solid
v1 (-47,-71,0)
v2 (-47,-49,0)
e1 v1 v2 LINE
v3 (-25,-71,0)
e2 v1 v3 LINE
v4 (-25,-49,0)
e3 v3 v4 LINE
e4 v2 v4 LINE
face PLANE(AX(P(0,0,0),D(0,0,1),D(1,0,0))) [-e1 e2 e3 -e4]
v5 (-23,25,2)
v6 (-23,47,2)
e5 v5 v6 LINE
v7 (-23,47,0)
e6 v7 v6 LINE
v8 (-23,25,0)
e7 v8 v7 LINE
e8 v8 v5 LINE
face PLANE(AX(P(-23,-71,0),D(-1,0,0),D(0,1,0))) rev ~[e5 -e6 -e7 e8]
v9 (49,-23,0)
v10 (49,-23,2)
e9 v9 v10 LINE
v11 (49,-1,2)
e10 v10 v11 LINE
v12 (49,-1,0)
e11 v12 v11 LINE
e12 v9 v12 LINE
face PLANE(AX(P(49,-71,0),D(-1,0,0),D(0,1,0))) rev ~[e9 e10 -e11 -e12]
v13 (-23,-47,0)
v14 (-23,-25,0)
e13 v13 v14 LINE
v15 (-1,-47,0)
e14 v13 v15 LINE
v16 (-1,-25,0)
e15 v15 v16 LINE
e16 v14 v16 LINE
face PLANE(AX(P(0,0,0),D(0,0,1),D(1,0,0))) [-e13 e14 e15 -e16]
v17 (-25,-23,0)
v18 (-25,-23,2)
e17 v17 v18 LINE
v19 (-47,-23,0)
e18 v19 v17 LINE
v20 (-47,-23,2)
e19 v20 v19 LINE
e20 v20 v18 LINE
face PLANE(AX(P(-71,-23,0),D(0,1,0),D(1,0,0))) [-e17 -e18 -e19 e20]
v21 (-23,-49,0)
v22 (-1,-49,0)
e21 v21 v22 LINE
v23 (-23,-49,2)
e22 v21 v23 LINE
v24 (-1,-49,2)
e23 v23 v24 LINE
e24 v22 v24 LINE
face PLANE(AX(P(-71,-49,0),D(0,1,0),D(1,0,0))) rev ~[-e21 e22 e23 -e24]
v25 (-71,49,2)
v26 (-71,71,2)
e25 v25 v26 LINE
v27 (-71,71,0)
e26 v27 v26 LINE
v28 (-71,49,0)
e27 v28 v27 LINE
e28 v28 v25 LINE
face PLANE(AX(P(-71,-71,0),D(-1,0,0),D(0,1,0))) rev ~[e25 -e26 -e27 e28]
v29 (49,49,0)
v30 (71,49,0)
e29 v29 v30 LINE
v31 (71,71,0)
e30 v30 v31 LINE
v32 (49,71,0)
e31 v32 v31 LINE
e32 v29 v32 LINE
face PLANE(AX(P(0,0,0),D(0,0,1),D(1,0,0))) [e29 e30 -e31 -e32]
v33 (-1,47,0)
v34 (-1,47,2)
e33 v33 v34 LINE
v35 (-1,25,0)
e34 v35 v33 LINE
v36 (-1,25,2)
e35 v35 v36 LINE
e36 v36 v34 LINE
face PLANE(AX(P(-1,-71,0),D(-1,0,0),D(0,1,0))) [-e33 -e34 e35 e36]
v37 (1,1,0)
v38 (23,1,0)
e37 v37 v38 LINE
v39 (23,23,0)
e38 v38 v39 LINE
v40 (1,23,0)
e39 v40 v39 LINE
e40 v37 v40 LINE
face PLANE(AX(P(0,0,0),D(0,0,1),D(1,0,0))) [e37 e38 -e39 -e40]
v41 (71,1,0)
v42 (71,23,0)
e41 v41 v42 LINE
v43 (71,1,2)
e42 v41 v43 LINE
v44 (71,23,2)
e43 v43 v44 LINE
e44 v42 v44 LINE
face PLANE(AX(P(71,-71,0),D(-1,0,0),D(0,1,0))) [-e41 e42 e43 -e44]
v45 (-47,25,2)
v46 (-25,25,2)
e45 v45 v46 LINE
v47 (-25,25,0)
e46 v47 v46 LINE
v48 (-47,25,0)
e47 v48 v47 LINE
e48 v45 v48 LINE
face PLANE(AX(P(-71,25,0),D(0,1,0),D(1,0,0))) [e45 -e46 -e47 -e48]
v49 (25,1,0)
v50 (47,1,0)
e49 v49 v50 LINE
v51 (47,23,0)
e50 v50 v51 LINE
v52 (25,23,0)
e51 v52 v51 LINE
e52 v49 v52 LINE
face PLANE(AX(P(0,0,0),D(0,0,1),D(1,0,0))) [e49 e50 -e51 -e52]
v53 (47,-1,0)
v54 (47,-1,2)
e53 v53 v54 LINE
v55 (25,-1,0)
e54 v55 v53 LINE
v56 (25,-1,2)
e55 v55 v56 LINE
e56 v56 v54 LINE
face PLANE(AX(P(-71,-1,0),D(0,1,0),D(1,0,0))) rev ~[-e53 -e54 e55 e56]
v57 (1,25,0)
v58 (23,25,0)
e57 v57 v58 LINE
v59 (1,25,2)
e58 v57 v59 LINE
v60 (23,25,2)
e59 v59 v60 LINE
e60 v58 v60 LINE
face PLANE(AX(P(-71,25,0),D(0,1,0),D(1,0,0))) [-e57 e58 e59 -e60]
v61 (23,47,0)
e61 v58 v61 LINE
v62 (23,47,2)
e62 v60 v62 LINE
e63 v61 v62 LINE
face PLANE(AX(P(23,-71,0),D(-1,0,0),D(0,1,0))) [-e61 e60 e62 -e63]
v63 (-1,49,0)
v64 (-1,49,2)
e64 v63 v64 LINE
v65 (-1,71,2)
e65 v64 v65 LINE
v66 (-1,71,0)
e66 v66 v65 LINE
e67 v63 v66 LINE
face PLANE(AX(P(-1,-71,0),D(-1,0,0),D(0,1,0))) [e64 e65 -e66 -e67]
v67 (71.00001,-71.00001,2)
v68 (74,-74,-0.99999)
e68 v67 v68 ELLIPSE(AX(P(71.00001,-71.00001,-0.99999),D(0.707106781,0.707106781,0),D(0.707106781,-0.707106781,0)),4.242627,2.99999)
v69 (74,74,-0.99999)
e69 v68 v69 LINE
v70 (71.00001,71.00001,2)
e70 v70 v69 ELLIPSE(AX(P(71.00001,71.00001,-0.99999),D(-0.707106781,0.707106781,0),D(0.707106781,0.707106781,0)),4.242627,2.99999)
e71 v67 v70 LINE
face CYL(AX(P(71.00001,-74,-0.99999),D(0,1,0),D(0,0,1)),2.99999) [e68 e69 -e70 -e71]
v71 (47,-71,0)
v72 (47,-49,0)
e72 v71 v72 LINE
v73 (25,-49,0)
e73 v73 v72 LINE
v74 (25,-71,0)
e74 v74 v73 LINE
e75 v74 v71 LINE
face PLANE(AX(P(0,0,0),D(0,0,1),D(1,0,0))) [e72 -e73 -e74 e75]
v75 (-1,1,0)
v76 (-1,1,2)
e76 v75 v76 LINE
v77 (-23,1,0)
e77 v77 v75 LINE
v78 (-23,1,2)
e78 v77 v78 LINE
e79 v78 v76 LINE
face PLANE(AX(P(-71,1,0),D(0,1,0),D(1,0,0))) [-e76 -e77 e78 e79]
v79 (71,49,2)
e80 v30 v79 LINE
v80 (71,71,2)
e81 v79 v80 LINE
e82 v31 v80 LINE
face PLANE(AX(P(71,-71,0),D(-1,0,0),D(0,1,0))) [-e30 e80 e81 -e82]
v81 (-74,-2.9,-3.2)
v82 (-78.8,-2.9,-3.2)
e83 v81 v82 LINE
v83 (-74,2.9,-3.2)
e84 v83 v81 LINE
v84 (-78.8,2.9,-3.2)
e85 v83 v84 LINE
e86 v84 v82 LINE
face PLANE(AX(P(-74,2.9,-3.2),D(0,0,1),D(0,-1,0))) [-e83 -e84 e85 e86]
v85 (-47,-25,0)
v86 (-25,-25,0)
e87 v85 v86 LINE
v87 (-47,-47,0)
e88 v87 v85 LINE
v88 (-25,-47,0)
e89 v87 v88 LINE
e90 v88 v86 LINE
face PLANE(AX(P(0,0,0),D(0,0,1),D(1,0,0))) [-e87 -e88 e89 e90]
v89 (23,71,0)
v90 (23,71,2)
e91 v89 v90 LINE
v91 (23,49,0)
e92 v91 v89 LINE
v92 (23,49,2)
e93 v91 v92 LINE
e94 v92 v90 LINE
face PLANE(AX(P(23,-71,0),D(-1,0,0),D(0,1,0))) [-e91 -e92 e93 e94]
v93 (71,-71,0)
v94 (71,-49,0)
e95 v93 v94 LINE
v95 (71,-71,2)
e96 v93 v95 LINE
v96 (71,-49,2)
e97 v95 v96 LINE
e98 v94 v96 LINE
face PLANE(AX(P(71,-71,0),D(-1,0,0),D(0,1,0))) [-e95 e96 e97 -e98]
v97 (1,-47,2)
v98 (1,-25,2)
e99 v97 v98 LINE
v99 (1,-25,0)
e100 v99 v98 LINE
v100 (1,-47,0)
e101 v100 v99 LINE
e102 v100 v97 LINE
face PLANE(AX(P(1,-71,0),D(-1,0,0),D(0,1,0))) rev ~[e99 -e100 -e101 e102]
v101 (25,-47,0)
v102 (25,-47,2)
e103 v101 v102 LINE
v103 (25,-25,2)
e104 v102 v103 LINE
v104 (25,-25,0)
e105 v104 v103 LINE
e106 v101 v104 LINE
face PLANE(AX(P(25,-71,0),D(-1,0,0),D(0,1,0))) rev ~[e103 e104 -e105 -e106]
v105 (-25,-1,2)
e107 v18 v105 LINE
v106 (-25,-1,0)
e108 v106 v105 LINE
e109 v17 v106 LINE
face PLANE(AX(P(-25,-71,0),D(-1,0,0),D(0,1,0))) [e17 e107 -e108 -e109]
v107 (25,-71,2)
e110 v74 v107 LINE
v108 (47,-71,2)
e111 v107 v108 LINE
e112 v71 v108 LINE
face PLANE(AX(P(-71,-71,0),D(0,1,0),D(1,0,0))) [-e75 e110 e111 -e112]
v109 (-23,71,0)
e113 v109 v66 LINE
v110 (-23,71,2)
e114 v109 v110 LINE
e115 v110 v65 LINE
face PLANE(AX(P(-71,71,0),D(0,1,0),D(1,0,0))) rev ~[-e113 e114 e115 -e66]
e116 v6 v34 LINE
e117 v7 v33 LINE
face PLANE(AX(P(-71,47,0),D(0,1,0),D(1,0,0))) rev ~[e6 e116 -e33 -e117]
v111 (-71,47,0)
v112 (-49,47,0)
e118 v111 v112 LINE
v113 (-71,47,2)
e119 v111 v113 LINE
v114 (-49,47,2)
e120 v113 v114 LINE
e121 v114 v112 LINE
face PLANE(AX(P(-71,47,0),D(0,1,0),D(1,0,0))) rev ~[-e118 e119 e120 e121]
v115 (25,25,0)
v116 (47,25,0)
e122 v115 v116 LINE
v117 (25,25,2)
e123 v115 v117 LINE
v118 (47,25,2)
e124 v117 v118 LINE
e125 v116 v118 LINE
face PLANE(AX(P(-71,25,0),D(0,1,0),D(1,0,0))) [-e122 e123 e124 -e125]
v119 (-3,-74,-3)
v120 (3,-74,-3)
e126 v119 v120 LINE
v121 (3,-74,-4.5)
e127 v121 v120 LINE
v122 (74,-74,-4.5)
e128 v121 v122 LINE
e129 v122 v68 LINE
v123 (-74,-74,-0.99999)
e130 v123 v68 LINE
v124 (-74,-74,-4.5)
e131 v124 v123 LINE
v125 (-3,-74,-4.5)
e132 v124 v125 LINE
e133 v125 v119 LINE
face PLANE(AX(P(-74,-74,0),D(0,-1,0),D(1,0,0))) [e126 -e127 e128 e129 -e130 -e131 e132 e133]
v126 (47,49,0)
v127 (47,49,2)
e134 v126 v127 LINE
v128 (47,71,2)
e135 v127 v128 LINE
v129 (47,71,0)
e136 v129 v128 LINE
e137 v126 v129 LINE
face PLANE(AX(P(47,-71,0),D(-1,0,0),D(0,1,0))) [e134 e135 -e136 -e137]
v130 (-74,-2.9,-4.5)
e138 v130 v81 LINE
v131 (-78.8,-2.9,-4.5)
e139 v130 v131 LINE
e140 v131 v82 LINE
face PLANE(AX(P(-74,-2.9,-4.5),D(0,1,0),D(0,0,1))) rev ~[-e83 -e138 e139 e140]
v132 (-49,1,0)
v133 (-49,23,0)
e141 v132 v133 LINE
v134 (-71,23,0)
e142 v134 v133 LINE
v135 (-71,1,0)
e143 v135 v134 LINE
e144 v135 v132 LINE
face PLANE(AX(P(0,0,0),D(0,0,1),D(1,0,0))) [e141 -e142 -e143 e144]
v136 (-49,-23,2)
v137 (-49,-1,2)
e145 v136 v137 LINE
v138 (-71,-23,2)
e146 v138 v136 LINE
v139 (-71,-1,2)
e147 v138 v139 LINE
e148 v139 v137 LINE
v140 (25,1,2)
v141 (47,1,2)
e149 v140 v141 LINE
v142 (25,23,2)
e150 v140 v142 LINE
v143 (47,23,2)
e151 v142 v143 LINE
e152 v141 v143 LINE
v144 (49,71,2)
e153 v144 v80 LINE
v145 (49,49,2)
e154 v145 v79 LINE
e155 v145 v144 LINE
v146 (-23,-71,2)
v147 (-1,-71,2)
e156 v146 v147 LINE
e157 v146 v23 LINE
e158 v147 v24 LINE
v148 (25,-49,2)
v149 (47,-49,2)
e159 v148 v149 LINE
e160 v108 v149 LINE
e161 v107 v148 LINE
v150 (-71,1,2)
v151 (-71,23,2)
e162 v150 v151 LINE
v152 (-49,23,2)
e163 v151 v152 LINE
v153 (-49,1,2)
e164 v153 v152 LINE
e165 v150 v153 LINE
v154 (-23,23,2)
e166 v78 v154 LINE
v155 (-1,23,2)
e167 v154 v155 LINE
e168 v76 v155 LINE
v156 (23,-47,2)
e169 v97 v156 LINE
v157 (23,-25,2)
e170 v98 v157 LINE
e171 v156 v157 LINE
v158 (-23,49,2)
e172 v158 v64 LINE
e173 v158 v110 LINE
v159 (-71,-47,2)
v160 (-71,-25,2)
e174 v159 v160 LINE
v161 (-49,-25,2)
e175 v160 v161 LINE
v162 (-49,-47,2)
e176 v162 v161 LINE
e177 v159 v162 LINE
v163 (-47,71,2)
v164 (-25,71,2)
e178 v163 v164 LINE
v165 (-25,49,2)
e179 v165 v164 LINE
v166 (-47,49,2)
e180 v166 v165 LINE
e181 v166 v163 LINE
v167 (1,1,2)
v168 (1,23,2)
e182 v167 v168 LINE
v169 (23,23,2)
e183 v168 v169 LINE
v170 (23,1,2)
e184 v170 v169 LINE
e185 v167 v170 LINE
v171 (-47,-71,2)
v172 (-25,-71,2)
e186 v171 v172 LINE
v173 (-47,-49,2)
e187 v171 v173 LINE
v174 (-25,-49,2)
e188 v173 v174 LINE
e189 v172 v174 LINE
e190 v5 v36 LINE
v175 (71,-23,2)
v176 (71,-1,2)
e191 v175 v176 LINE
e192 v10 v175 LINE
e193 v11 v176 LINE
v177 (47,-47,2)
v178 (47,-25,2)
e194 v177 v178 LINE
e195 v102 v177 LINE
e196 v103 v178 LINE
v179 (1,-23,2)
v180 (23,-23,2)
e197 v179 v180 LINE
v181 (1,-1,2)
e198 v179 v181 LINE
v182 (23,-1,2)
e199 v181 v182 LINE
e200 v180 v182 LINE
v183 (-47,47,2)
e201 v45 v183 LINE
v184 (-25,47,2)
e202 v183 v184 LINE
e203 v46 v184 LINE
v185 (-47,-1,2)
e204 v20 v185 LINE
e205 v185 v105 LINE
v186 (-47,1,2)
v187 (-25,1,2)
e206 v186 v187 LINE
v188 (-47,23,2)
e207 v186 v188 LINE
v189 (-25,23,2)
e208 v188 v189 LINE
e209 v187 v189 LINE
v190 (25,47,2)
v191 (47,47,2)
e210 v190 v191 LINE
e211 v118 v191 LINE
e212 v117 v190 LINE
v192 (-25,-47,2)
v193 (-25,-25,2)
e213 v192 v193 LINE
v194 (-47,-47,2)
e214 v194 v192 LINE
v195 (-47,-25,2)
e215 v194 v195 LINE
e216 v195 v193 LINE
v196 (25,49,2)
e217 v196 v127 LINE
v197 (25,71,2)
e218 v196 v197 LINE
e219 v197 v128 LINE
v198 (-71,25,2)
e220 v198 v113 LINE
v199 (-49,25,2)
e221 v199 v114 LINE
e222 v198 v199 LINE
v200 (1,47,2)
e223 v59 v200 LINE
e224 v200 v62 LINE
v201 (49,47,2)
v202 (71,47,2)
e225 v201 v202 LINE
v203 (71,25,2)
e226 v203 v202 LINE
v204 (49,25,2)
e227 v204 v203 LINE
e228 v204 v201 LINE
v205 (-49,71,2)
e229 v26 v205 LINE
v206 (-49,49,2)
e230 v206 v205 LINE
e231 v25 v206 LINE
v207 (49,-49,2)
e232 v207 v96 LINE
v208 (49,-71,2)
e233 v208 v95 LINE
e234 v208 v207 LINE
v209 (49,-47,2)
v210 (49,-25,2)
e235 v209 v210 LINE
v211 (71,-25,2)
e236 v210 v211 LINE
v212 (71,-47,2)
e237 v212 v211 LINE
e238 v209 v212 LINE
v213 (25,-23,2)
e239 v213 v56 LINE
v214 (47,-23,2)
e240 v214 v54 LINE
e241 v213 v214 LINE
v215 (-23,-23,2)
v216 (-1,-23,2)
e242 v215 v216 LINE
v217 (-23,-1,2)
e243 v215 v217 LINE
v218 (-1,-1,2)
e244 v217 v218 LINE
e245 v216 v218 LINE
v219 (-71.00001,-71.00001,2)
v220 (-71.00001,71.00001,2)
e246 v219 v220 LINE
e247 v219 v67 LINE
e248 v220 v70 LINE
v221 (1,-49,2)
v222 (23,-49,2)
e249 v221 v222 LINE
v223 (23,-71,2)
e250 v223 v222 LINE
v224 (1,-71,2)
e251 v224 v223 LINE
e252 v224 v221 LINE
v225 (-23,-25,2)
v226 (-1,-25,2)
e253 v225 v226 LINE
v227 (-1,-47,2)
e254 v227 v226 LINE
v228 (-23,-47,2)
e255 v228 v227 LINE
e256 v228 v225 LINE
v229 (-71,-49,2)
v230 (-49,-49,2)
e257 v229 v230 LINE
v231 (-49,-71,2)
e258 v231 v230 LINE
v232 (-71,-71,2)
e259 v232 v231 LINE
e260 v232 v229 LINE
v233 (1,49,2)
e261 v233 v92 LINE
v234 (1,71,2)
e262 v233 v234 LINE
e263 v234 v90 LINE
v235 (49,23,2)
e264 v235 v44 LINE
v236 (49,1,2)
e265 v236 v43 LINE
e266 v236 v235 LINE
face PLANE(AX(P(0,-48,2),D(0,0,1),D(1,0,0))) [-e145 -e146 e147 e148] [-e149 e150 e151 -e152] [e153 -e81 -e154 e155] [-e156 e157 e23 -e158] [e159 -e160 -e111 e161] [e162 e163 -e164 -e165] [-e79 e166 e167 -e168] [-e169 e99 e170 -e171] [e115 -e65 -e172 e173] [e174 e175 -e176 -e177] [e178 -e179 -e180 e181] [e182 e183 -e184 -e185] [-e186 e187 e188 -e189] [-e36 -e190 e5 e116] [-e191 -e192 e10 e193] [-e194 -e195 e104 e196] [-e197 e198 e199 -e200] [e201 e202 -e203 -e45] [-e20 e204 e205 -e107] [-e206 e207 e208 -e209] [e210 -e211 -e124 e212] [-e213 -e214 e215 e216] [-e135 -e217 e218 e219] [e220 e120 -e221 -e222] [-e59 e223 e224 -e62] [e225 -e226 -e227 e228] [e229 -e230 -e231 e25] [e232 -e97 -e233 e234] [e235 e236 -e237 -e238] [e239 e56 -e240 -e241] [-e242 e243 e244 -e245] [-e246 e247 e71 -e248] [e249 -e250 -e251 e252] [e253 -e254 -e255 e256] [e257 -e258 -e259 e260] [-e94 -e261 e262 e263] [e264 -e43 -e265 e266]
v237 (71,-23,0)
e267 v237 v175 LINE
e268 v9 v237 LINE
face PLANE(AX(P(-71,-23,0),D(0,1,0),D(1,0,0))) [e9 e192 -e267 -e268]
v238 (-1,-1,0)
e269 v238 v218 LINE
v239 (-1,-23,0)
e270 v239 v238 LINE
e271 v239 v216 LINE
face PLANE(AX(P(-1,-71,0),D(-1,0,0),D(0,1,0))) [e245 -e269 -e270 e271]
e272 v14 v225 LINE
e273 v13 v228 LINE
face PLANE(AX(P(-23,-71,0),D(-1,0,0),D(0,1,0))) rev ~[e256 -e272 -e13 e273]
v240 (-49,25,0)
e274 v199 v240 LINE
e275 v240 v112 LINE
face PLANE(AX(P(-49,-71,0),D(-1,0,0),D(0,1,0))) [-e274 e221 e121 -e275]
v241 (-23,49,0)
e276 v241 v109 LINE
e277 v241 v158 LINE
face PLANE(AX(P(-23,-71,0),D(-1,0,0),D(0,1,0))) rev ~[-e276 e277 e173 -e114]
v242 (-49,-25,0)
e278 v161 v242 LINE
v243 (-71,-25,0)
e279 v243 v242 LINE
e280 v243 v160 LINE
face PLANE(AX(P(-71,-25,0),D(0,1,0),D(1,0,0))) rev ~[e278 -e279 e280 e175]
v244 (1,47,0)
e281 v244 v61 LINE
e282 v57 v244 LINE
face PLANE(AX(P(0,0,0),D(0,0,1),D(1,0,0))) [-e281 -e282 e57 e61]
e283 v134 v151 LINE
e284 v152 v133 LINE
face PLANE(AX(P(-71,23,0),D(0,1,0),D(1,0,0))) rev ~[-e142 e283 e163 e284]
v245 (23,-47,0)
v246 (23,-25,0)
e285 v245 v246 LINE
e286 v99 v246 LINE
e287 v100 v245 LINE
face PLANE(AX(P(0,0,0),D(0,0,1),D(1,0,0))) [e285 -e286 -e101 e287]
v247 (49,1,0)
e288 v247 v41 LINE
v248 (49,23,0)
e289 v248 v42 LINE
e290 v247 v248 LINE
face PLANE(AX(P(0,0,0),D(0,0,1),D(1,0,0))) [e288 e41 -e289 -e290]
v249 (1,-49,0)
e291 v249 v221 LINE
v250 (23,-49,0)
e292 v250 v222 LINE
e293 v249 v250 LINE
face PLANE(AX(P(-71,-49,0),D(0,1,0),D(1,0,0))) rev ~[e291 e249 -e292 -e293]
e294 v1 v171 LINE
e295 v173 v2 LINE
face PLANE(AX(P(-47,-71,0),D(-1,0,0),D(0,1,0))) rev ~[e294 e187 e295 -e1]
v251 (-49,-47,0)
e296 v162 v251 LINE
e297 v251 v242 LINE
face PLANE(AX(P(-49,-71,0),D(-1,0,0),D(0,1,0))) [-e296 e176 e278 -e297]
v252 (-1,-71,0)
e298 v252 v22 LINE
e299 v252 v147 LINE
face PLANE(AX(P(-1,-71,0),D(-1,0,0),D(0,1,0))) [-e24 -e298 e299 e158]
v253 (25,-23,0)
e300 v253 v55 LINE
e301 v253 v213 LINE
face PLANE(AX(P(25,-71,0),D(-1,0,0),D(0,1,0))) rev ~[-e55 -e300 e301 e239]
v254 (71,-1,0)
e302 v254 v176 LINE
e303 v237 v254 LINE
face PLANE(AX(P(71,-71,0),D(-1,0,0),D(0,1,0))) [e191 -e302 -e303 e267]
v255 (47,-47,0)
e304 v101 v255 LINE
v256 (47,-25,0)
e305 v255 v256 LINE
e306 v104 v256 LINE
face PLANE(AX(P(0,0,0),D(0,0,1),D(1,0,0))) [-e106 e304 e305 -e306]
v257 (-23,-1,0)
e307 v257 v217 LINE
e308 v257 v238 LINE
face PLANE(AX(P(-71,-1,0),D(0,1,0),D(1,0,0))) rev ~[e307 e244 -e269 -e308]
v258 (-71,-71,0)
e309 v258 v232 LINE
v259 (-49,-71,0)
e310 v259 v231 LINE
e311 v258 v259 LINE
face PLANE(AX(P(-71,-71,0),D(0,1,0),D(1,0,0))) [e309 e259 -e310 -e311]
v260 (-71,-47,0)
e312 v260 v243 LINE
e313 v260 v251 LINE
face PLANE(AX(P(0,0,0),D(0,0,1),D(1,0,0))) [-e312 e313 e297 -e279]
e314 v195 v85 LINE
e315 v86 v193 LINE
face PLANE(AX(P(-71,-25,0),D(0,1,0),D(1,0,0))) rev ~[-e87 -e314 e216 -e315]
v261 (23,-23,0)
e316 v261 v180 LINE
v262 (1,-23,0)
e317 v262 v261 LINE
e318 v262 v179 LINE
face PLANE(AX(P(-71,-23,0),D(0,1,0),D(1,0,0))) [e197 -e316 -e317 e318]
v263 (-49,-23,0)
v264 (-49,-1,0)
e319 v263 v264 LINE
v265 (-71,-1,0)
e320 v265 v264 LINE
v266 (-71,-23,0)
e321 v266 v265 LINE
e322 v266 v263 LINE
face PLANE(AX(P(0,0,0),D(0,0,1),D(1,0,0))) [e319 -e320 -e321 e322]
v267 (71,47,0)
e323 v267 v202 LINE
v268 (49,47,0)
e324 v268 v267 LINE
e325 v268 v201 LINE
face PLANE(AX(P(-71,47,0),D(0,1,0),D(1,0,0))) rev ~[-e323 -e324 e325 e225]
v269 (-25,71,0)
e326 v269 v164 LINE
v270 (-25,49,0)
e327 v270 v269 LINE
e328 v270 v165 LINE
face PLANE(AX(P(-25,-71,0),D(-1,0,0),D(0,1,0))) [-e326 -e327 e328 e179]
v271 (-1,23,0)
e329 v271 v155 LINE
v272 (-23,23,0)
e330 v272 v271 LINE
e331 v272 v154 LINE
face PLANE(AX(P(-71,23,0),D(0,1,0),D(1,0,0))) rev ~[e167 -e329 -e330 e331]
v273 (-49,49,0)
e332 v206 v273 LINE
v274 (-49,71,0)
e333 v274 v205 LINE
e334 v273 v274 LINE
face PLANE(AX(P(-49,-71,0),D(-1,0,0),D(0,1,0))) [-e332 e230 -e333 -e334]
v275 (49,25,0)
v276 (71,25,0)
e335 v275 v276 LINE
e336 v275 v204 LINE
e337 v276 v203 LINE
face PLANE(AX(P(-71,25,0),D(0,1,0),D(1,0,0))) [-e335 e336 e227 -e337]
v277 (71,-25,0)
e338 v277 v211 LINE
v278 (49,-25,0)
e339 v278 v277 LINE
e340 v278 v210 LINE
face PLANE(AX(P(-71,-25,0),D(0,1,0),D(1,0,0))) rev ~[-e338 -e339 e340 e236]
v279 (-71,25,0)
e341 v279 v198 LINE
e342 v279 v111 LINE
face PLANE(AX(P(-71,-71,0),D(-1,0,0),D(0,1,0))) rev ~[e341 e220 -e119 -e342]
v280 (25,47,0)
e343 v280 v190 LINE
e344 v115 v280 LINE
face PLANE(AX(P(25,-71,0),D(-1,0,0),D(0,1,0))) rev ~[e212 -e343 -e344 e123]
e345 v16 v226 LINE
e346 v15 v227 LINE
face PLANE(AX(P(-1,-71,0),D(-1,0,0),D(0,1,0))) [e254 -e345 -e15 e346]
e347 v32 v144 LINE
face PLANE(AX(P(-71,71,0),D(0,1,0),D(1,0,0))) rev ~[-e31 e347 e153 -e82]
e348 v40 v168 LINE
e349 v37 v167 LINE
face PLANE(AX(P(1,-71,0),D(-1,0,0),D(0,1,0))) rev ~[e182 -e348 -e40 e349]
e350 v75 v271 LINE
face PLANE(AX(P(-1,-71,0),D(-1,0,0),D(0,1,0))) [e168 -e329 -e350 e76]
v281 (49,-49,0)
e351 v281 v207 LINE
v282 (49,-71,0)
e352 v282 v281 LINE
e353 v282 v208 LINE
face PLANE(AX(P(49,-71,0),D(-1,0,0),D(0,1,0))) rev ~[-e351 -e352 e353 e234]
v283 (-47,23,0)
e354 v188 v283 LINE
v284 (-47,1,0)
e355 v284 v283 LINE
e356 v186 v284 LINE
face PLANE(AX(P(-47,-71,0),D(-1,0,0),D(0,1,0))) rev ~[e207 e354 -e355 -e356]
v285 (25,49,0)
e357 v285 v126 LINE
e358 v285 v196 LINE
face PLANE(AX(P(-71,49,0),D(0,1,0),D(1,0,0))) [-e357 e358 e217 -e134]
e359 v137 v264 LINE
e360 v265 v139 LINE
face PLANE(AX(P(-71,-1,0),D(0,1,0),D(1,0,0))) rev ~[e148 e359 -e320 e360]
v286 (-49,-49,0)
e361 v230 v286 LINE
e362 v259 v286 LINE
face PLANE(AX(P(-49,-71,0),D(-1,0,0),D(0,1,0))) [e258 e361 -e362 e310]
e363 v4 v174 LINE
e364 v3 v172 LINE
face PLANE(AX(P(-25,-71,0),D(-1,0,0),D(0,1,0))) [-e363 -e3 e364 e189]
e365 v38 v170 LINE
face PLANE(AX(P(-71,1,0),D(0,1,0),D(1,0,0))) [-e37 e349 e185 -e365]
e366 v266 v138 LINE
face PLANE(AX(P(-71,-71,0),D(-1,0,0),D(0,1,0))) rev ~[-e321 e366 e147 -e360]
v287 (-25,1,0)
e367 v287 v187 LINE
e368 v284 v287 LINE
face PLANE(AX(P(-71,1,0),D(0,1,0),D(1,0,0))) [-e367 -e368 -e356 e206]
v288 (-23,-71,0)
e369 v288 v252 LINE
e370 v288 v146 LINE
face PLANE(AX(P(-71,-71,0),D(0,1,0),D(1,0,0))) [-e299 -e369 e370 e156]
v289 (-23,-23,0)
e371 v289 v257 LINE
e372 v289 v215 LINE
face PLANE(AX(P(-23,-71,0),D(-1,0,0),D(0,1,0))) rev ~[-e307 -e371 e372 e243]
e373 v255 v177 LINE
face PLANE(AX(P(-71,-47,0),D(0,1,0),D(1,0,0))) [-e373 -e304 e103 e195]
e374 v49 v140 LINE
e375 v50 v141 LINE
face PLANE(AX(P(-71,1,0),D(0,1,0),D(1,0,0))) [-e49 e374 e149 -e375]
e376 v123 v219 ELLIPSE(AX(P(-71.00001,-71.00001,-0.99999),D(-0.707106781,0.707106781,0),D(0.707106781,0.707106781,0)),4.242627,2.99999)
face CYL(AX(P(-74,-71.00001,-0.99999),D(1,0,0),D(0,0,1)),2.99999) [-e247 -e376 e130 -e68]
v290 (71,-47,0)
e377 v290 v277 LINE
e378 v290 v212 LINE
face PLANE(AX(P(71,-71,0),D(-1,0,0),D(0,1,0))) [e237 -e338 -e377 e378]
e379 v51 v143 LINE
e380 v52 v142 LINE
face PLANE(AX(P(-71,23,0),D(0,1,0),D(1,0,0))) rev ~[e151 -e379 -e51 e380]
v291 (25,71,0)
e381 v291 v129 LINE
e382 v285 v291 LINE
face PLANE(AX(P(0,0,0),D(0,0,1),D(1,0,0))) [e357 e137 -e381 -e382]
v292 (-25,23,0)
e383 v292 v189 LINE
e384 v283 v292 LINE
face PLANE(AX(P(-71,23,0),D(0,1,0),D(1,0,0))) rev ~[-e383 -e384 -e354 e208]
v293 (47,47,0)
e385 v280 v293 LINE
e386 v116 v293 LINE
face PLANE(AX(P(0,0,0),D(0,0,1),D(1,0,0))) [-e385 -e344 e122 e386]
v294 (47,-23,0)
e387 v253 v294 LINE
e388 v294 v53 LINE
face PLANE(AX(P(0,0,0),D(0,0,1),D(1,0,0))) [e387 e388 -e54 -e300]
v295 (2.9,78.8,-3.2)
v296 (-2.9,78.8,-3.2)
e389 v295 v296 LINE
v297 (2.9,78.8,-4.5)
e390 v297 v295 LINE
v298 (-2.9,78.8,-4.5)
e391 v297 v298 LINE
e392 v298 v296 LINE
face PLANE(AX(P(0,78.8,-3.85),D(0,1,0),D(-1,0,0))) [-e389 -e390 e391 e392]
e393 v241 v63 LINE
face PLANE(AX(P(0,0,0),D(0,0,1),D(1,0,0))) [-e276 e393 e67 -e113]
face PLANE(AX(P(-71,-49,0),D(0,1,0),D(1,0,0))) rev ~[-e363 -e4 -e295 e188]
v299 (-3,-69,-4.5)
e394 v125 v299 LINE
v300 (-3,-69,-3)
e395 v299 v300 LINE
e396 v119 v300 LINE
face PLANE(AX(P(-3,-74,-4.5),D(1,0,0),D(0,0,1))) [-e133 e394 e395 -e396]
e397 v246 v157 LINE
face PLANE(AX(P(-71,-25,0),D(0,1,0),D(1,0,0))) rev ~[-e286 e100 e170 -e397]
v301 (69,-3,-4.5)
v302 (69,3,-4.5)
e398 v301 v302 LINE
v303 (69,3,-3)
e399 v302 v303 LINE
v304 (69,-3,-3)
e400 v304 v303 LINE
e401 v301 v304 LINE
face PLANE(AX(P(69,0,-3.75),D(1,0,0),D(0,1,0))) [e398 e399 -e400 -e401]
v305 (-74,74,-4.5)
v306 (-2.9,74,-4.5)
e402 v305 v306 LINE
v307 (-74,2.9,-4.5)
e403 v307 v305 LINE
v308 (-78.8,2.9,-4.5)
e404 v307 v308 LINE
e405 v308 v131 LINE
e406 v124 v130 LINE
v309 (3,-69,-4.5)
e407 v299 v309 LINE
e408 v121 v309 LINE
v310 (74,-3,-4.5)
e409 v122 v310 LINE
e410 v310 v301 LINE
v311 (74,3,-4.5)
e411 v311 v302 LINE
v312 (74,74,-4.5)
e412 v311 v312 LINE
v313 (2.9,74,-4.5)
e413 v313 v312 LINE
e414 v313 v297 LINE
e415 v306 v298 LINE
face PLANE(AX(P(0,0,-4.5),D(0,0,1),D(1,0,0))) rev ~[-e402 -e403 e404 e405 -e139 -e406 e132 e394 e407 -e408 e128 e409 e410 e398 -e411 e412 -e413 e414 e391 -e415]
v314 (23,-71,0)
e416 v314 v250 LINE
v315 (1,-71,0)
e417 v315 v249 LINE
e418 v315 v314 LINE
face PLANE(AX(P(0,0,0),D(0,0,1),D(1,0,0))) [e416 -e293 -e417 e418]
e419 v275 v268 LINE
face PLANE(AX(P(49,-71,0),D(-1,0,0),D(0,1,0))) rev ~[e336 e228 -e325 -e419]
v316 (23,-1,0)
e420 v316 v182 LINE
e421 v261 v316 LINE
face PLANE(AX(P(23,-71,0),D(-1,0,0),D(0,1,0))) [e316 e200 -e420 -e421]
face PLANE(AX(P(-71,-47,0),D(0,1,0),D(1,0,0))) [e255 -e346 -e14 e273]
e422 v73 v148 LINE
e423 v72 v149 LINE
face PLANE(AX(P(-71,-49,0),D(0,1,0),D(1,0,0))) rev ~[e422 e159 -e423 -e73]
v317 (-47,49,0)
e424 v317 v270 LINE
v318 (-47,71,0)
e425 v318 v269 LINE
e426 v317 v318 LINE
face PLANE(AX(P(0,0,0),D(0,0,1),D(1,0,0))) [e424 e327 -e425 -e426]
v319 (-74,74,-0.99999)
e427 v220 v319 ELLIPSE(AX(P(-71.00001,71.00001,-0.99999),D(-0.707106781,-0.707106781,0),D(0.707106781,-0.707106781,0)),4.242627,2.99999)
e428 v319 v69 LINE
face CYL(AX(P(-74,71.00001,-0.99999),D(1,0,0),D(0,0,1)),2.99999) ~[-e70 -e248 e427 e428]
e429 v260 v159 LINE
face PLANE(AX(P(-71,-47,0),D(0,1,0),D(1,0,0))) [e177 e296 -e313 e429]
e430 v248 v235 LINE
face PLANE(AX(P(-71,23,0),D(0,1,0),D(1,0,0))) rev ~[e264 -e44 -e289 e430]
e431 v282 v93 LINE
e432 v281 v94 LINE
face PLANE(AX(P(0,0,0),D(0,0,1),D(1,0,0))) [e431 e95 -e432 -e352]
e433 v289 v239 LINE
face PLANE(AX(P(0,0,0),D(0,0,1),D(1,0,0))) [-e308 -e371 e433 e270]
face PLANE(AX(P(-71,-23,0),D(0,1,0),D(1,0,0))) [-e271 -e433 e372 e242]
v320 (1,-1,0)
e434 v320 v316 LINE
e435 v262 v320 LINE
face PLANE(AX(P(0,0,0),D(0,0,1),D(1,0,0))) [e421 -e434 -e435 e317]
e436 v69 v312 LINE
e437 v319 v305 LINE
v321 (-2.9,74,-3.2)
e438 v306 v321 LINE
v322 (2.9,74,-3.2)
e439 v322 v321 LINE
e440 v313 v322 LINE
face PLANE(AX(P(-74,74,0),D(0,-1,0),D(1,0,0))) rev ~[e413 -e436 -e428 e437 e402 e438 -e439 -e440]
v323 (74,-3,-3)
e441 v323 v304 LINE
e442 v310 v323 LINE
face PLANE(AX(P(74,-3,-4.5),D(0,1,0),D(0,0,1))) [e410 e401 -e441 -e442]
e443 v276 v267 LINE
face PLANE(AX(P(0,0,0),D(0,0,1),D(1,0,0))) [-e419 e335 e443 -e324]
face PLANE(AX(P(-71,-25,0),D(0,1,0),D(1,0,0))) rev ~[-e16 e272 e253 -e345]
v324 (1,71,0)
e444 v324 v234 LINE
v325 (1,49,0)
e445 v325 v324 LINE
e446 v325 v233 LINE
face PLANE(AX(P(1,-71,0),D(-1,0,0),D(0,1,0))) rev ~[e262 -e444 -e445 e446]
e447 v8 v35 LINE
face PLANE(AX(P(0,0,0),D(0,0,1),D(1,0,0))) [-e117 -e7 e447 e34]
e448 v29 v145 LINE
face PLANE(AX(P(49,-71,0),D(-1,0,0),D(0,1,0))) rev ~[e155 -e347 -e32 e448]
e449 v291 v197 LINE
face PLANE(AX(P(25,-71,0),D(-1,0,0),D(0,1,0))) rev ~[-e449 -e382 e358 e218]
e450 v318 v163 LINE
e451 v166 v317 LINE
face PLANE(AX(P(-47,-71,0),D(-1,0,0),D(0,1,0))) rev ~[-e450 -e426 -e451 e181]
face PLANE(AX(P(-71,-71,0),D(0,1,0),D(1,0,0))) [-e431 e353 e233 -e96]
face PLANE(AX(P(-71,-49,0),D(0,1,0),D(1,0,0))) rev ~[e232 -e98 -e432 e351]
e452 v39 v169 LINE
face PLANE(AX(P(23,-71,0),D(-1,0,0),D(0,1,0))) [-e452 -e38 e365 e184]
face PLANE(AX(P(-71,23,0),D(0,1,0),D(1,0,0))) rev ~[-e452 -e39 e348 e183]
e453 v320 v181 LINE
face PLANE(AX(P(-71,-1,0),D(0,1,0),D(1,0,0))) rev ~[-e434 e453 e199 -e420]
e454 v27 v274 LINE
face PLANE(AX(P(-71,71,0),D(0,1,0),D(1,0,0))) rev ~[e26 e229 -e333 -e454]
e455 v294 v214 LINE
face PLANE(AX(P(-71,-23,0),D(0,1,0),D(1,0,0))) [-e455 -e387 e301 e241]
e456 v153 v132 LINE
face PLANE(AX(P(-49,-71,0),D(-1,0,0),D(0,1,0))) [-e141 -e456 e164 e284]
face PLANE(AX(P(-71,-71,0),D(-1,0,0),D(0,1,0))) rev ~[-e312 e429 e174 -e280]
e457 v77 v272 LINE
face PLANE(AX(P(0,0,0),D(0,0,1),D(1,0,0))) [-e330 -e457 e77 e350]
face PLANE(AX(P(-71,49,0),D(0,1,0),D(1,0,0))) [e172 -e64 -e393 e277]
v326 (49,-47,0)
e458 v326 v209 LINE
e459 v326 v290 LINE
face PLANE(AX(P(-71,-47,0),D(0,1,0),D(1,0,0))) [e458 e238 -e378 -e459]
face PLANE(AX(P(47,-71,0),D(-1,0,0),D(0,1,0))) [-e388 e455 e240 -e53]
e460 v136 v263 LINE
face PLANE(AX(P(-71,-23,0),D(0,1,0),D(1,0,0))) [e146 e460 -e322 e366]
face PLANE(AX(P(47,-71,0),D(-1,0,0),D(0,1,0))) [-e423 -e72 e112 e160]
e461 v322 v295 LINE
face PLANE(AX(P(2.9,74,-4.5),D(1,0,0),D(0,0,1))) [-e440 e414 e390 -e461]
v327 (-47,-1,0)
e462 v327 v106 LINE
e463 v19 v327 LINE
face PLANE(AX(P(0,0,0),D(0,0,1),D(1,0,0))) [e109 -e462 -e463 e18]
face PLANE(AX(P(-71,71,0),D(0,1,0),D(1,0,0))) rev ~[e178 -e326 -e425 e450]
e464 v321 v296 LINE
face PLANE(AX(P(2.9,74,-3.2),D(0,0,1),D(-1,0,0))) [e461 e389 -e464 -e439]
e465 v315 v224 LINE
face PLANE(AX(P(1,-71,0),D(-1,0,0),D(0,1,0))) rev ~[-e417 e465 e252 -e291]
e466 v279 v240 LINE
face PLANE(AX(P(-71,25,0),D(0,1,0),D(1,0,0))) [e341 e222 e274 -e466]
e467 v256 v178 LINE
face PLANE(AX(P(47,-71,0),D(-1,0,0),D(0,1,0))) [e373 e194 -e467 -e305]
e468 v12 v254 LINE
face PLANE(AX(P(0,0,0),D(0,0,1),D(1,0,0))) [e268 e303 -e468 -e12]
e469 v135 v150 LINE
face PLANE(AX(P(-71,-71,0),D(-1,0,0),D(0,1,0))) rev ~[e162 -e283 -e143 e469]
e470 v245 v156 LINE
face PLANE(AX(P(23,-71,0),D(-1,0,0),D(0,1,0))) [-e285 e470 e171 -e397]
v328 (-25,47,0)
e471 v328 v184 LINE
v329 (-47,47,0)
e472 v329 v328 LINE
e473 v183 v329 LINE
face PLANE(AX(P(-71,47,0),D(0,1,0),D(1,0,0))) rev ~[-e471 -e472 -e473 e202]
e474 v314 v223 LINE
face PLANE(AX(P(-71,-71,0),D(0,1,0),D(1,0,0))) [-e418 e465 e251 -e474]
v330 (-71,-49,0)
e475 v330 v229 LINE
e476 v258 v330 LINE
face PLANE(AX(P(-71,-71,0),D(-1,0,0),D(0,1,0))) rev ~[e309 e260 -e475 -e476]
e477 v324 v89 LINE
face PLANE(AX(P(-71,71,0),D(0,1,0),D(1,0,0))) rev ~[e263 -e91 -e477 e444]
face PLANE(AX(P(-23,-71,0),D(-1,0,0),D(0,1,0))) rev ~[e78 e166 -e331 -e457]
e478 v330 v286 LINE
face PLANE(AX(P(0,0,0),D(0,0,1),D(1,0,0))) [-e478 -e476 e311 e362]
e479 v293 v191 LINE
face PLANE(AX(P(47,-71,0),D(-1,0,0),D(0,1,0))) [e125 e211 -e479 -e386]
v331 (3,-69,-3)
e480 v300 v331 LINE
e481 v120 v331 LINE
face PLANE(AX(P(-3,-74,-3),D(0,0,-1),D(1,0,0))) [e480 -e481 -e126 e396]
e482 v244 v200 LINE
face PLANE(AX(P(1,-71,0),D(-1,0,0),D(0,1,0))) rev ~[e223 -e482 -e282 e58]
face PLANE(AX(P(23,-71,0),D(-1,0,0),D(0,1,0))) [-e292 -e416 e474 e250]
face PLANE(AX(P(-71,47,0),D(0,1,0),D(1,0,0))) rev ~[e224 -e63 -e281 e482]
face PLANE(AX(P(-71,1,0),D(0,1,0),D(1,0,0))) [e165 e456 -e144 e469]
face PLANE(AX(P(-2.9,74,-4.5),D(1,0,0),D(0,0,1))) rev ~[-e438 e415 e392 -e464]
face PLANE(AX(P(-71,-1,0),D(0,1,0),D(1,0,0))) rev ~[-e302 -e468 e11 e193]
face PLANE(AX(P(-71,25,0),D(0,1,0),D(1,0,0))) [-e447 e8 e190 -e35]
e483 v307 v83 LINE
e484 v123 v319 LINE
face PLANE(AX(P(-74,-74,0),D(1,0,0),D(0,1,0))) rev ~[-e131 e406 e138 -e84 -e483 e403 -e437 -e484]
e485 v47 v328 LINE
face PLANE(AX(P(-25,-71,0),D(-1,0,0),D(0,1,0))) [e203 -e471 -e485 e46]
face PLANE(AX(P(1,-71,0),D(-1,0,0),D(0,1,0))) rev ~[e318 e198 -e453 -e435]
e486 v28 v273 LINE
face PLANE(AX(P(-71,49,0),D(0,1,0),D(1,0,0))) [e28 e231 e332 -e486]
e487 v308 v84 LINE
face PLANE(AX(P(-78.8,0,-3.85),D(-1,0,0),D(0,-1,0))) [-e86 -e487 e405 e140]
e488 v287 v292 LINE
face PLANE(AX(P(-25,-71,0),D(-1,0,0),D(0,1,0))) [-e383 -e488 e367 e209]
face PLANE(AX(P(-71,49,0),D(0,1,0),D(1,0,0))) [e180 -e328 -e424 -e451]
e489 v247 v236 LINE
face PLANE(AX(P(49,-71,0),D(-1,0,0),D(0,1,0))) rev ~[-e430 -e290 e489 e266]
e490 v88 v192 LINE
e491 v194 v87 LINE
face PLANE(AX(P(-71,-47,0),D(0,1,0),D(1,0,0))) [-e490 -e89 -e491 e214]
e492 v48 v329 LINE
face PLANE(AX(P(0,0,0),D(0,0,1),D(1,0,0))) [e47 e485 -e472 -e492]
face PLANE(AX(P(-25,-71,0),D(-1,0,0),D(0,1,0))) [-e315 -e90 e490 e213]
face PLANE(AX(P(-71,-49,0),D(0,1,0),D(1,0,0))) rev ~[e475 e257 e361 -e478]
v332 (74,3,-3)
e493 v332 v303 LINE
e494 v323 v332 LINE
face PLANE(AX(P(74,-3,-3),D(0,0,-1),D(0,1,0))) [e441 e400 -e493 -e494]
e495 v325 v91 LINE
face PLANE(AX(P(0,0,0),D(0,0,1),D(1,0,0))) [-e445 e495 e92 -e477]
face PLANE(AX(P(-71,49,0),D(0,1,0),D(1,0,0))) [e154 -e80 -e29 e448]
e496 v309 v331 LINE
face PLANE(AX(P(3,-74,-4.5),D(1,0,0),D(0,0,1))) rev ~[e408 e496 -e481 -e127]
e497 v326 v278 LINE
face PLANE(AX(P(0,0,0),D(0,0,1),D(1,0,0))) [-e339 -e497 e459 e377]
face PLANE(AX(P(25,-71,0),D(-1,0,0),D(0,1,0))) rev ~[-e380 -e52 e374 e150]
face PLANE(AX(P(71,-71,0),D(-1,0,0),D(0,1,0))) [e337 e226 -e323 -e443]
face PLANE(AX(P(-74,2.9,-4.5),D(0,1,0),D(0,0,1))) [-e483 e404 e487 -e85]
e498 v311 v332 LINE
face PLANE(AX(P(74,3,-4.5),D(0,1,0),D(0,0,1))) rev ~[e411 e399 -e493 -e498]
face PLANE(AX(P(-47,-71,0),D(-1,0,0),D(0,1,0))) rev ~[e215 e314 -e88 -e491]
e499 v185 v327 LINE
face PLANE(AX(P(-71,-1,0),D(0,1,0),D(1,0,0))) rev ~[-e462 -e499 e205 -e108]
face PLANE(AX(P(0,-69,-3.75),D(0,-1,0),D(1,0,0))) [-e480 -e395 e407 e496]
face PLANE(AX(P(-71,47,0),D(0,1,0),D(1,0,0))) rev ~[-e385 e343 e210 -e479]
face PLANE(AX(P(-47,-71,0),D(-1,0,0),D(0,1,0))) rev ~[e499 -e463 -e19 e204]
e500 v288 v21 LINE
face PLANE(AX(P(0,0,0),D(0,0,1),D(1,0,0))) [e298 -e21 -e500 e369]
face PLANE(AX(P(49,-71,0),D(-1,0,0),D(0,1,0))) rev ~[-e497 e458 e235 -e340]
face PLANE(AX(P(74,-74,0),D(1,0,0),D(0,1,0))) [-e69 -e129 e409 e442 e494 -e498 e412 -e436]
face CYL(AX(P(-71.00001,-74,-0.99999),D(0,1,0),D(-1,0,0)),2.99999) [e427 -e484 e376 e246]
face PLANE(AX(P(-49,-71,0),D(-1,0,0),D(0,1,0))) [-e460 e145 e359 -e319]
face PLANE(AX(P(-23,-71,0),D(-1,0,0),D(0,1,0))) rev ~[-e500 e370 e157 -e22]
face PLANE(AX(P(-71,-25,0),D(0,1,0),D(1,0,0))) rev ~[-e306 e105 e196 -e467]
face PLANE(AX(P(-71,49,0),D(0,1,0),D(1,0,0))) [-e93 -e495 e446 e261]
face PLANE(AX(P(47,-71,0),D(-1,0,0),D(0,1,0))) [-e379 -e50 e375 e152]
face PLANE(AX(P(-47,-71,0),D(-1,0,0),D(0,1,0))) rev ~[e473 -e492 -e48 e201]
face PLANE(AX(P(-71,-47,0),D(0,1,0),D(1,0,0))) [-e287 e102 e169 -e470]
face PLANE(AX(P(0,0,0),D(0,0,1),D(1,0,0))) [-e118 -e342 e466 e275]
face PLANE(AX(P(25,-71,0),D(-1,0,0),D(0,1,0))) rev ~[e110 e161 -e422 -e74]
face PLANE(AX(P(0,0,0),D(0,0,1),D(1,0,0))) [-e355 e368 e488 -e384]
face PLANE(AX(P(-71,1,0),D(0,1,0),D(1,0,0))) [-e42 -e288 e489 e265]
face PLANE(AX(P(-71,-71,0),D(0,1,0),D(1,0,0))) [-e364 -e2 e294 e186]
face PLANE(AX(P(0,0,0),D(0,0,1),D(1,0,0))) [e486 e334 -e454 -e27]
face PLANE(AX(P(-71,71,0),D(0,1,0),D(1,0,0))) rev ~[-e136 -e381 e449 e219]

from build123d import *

# Parameters (mm, degrees)
F1_W      = 2
F1_H      = 142
F3_DEPTH  = 2
F0_W      = 148
F0_H      = 148
F0_W_2    = 142
F0_H_2    = 142
F2_W      = 142
F2_H      = 2
F5_DEPTH  = 2
F6_DEPTH  = 2
F4_W      = 148
F4_H      = 148
F7_DEPTH  = 4.5
F8_R      = 2.99999
F9_W      = 6
F9_H      = 1.5
F10_DEPTH = 5
F11_W     = 6
F11_H     = 1.5
F12_DEPTH = 5
F13_W     = 5.8
F13_H     = 1.3
F14_DEPTH = 4.8
F15_W     = 5.8
F15_H     = 1.3
F16_DEPTH = 4.8


# Not quite as in the source:
# - a fillet or chamfer is up to 0.001 mm smaller than in the source, because OpenCascade refuses the exact size


with BuildPart() as f3:
    # F1 (on Top) → F3 (new body)
    with BuildSketch(Plane.XY):
        with Locations((-48, 0)):
            Rectangle(F1_W, F1_H)
    extrude(amount=F3_DEPTH)



with BuildPart() as f3b:
    # F0 (on Top) → F3, piece 2 (new body)
    with BuildSketch(Plane.XY):
        Rectangle(F0_W, F0_H)
        Rectangle(F0_W_2, F0_H_2, mode=Mode.SUBTRACT)
    extrude(amount=F3_DEPTH)


with BuildPart() as f5:
    # F2 (on Top) → F5 (new body)
    with BuildSketch(Plane.XY):
        with Locations((0, 48)):
            Rectangle(F2_W, F2_H)
    extrude(amount=F5_DEPTH)


with BuildPart() as f5b:
    # F2 (on Top) → F5, piece 2 (new body)
    with BuildSketch(Plane.XY):
        with Locations((0, 24)):
            Rectangle(F2_W, F2_H)
    extrude(amount=F5_DEPTH)


with BuildPart() as f5c:
    # F2 (on Top) → F5, piece 3 (new body)
    with BuildSketch(Plane.XY):
        Rectangle(F2_W, F2_H)
    extrude(amount=F5_DEPTH)


with BuildPart() as f5d:
    # F2 (on Top) → F5, piece 4 (new body)
    with BuildSketch(Plane.XY):
        with Locations((0, -24)):
            Rectangle(F2_W, F2_H)
    extrude(amount=F5_DEPTH)


with BuildPart() as f5e:
    # F2 (on Top) → F5, piece 5 (new body)
    with BuildSketch(Plane.XY):
        with Locations((0, -48)):
            Rectangle(F2_W, F2_H)
    extrude(amount=F5_DEPTH)


with BuildPart() as f3_1:
    add(f3.part)

    add(f3b.part)  # F6 merges F3b

    add(f5.part)  # F6 merges F5

    add(f5b.part)  # F6 merges F5b

    add(f5c.part)  # F6 merges F5c

    add(f5d.part)  # F6 merges F5d

    add(f5e.part)  # F6 merges F5e
    # F1 (on Top) → F6 (join)
    with BuildSketch(Plane.XY):
        with Locations((-48, 0)):
            Rectangle(F1_W, F1_H)
        with Locations((-24, 0)):
            Rectangle(F1_W, F1_H)
        Rectangle(F1_W, F1_H)
        with Locations((24, 0)):
            Rectangle(F1_W, F1_H)
        with Locations((48, 0)):
            Rectangle(F1_W, F1_H)
    extrude(amount=F6_DEPTH)

    # F4 (on Top) → F7 (join)
    with BuildSketch(Plane.XY):
        Rectangle(F4_W, F4_H)
    extrude(amount=-F7_DEPTH)

    # F8 (radius 3 in the source; OpenCascade refuses exactly that, so slightly less here)
    f8_edges = [f3_1.edges().sort_by_distance(p)[0] for p in [
        (0, 74, 2),
        (-74, 0, 2),
        (0, -74, 2),
        (74, 0, 2),
    ]]
    fillet(f8_edges, radius=F8_R)

    # F9 (on face) → F10 (cut)
    with BuildSketch(Plane.YZ.offset(74)):
        with Locations((0, -3.75)):
            Rectangle(F9_W, F9_H)
    extrude(amount=-F10_DEPTH, mode=Mode.SUBTRACT)

    # F11 (on face) → F12 (cut)
    with BuildSketch(Plane.XZ.offset(74)):
        with Locations((0, -3.75)):
            Rectangle(F11_W, F11_H)
    extrude(amount=-F12_DEPTH, mode=Mode.SUBTRACT)

    # F13 (on face) → F14 (join)
    with BuildSketch(Plane(origin=(-74, 0, 0), x_dir=(0, -1, 0), z_dir=(-1, 0, 0))):
        with Locations((0, -3.85)):
            Rectangle(F13_W, F13_H)
    extrude(amount=F14_DEPTH)

    # F15 (on face) → F16 (join)
    with BuildSketch(Plane(origin=(0, 74, 0), x_dir=(-1, 0, 0), z_dir=(0, 1, 0))):
        with Locations((0, -3.85)):
            Rectangle(F15_W, F15_H)
    extrude(amount=F16_DEPTH)


solid = f3_1.part
